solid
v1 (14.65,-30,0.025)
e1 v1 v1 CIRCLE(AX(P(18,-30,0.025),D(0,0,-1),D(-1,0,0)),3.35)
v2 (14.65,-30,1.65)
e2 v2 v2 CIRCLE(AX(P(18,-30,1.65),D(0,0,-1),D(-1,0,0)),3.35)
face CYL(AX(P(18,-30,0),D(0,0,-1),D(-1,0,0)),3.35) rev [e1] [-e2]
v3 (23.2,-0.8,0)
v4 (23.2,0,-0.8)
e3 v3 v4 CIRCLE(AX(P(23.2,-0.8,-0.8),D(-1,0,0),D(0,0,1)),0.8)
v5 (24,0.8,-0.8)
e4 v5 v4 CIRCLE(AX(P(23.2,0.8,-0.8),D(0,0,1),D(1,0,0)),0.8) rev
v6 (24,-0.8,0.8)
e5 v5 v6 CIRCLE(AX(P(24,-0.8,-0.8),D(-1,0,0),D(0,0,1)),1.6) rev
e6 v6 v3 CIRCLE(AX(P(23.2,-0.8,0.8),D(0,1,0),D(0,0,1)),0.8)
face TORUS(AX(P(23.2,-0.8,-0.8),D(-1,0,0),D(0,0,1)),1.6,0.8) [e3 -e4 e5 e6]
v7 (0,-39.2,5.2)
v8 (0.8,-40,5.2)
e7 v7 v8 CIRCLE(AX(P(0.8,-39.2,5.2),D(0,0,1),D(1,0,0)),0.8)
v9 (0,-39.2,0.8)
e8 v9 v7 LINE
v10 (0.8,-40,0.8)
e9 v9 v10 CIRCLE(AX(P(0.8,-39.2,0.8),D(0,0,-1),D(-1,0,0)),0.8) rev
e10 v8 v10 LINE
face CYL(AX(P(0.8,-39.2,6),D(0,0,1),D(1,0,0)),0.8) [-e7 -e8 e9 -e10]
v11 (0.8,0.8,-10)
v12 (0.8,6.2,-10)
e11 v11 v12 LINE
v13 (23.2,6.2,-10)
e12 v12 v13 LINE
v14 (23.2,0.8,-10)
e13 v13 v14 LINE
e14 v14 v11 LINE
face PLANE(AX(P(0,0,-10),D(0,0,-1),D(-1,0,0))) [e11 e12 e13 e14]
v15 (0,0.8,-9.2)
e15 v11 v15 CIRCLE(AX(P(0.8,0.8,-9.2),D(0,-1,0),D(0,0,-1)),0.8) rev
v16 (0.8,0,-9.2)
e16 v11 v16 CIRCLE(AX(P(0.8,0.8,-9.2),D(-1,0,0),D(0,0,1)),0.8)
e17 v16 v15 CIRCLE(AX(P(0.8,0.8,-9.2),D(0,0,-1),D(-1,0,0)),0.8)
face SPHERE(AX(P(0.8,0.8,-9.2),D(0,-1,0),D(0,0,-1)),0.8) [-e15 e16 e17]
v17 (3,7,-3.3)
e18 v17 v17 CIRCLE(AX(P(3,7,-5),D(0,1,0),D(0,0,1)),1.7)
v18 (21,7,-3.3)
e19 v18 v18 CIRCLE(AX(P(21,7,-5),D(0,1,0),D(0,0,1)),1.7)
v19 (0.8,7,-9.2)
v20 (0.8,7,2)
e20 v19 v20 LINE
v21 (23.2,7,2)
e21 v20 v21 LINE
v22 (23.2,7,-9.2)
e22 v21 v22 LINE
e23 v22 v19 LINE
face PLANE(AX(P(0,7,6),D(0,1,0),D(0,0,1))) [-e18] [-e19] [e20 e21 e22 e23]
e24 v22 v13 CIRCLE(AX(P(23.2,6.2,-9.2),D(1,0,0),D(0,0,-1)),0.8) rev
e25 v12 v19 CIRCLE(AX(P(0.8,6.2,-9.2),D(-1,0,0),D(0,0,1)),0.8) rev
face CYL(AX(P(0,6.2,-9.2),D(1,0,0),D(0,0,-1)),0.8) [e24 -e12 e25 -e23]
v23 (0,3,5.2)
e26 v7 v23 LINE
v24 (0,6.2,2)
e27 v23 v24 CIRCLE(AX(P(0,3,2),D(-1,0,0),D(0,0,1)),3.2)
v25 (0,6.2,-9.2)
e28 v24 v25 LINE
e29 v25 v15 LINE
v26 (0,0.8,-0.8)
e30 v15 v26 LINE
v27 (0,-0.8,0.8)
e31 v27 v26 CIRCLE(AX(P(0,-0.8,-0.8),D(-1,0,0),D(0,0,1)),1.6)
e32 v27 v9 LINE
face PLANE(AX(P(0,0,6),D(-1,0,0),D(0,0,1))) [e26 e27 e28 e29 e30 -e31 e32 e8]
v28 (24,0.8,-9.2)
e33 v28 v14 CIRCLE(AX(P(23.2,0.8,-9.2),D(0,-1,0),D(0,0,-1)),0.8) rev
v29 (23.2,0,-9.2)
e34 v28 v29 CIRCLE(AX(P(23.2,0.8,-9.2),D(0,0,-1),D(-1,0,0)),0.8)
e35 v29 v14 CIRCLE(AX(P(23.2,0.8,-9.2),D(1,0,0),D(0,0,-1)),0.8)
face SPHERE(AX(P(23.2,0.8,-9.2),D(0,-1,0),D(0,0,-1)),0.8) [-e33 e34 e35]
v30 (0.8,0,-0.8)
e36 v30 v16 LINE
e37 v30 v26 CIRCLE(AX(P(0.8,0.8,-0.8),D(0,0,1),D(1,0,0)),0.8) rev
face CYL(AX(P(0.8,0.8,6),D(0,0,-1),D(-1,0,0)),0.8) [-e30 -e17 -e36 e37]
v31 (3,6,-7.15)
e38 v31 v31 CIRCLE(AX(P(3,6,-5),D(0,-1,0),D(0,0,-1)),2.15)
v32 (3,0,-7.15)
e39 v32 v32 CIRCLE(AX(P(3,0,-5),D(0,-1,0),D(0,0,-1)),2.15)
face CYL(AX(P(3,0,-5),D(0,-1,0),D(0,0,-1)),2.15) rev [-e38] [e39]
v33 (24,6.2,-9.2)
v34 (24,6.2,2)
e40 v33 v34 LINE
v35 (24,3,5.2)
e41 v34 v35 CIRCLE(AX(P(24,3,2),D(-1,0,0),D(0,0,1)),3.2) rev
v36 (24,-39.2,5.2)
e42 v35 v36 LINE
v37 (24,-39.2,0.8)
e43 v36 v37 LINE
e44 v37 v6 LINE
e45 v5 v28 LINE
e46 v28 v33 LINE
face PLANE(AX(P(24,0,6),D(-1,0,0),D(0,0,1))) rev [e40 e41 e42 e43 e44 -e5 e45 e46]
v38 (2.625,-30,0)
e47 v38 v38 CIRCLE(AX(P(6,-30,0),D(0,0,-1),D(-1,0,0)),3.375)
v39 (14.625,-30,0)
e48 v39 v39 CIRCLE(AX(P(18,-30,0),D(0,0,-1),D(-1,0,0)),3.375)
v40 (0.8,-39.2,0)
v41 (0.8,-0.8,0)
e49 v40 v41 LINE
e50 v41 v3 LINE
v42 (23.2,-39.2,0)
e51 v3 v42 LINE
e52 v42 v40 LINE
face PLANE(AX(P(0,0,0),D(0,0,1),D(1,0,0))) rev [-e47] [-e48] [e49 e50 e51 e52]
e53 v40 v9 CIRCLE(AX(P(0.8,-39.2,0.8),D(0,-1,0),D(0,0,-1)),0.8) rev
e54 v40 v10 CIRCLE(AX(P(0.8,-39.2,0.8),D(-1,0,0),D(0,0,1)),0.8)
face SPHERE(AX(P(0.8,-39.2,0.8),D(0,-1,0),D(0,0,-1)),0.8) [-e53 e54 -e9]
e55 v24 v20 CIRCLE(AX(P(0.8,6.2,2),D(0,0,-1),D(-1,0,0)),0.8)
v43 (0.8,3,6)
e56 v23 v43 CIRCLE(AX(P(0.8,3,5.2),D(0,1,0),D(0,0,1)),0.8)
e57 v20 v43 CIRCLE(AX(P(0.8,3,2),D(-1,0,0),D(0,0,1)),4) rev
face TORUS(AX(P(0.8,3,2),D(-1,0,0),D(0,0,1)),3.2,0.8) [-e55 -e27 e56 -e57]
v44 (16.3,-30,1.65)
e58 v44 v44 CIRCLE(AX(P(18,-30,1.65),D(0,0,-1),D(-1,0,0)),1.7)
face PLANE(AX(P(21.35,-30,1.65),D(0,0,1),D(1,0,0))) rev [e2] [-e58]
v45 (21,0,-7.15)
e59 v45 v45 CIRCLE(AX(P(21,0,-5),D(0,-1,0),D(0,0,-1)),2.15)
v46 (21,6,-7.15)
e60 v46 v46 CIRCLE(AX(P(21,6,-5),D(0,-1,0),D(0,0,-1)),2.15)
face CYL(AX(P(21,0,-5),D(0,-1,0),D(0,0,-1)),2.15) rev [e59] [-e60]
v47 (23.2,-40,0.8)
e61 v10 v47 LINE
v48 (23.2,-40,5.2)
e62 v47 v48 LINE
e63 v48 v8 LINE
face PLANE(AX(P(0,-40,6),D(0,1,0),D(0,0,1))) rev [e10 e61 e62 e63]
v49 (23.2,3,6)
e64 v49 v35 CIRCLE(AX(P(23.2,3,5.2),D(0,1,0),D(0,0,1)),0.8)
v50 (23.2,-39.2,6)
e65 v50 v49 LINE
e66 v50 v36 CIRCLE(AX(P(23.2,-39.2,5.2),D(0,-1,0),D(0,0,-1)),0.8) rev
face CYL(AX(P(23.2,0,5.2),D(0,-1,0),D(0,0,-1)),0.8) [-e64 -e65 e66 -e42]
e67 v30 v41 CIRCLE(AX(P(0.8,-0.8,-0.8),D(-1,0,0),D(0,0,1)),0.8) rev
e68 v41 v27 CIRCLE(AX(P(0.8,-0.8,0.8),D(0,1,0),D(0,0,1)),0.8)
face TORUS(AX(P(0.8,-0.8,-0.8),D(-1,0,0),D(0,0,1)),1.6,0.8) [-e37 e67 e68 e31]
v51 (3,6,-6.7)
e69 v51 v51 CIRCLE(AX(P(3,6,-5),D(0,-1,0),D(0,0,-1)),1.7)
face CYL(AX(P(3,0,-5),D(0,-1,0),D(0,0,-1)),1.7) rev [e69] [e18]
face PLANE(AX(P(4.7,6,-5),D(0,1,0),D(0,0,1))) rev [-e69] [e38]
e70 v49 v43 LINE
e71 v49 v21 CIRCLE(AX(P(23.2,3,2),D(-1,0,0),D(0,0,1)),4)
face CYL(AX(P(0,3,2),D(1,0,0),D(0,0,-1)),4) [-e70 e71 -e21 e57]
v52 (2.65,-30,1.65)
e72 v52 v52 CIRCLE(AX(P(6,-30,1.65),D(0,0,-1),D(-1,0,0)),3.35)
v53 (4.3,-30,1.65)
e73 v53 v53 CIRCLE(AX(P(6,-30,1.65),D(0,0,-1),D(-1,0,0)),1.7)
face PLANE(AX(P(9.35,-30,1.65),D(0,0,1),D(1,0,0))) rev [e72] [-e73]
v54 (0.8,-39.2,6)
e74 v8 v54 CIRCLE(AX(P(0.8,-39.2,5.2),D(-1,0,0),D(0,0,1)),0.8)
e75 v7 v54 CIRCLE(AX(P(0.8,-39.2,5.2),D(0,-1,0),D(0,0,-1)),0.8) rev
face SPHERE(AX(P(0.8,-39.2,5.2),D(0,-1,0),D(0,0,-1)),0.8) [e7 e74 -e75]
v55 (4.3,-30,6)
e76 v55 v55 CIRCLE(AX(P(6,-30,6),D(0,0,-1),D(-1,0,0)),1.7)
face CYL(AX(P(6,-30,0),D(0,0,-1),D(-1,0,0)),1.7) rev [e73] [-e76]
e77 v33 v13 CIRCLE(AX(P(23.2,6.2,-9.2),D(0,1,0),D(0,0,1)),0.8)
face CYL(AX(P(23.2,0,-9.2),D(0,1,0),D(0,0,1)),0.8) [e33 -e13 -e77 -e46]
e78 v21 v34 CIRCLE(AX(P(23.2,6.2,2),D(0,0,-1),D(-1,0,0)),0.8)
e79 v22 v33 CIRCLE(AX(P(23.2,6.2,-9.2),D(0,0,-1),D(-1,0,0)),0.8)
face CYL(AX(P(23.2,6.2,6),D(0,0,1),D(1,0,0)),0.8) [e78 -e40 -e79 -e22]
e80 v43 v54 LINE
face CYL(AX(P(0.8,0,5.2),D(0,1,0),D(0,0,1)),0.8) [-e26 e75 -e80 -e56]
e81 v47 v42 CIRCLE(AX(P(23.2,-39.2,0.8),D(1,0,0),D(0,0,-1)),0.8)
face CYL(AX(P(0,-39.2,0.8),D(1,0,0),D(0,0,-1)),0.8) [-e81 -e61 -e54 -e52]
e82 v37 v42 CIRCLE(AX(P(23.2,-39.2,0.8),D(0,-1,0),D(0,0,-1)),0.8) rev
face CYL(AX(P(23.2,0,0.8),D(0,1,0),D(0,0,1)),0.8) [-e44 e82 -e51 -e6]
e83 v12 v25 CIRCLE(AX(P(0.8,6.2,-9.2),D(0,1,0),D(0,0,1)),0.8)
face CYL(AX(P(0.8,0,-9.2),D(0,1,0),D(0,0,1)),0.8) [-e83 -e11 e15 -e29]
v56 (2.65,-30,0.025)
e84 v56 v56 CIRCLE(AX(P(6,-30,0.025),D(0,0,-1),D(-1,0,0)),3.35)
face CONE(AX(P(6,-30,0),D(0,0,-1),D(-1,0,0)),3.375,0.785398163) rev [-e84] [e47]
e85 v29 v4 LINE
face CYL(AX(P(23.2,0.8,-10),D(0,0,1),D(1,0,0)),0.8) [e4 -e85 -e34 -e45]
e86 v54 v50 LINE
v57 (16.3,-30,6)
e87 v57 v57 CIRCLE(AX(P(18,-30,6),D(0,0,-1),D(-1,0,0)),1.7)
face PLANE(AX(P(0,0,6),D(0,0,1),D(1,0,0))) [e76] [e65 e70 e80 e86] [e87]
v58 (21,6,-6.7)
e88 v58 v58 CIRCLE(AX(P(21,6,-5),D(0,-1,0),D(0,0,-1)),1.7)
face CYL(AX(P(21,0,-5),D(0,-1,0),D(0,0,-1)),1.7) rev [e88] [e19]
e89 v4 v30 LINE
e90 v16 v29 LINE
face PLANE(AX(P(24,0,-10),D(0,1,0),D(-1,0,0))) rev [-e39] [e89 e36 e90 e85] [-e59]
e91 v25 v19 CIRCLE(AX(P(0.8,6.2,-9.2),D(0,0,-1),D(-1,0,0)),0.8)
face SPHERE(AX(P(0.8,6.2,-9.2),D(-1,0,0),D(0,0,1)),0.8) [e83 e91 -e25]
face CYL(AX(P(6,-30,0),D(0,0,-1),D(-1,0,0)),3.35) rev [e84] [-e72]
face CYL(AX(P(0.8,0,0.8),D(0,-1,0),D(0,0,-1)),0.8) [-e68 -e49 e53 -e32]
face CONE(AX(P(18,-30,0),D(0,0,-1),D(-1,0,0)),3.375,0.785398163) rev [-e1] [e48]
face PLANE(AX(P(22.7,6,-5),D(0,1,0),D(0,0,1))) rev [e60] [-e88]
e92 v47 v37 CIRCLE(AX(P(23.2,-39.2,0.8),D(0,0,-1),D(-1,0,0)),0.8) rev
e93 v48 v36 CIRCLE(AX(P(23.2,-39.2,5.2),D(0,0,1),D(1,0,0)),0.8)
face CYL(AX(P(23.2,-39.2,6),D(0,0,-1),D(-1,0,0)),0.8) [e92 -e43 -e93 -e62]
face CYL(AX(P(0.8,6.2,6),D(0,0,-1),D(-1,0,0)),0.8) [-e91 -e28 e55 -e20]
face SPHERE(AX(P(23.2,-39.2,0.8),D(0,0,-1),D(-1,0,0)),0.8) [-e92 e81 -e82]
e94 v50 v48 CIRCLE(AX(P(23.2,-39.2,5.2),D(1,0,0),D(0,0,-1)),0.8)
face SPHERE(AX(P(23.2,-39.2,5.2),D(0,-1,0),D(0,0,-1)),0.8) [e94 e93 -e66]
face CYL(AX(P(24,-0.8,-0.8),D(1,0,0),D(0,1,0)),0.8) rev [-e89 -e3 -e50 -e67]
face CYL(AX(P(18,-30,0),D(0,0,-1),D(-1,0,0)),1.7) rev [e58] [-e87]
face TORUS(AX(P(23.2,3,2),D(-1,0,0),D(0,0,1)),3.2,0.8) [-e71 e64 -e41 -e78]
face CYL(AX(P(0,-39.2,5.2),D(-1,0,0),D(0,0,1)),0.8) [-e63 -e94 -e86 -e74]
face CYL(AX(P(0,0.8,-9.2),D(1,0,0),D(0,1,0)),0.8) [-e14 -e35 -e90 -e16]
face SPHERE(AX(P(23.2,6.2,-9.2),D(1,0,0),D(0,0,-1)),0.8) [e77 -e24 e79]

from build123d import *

# Parameters (mm, degrees)
SKETCH2_W           = 24
SKETCH2_H           = 47
BOSS_EXTRUDE1_DEPTH = 6
SKETCH3_W           = 24
SKETCH3_H           = 7
BOSS_EXTRUDE2_DEPTH = 10
HOLE1_OUTLINE_R     = 2.15
HOLE1_DEPTH         = 6
HOLE1_START         = 6
HOLE1_2_OUTLINE_R   = 1.7
HOLE1_2_DEPTH       = 1
FILLET1_R           = 4
FILLET2_R           = 0.8


# Read off the part's stored shape, not the designer's step: Hole1, CBORE for M3 SBHCS1
with BuildPart() as part:
    # Sketch2 → Boss-Extrude1 (new body)
    with BuildSketch(Plane.XY):
        with Locations((12, -16.5)):
            Rectangle(SKETCH2_W, SKETCH2_H)
    extrude(amount=BOSS_EXTRUDE1_DEPTH)

    # Sketch3 → Boss-Extrude2 (add)
    with BuildSketch(Plane(origin=(0, 0, 0), x_dir=(-1, 0, 0), z_dir=(0, 0, -1))):
        with Locations((-12, 3.5)):
            Rectangle(SKETCH3_W, SKETCH3_H)
    extrude(amount=BOSS_EXTRUDE2_DEPTH)

    # Hole1 outline → Hole1 (cut)
    with BuildSketch(Plane(origin=(0, 0, 0), x_dir=(1, 0, 0), z_dir=(0, 1, 0))):
        with Locations((3, 5)):
            Circle(HOLE1_OUTLINE_R)
        with Locations((21, 5)):
            Circle(HOLE1_OUTLINE_R)
    extrude(amount=HOLE1_DEPTH, mode=Mode.SUBTRACT)

    # Hole1 2 outline → Hole1 2 (cut)
    with BuildSketch(Plane(origin=(0, 0, 0), x_dir=(1, 0, 0), z_dir=(0, 1, 0)).offset(HOLE1_START)):
        with Locations((3, 5)):
            Circle(HOLE1_2_OUTLINE_R)
        with Locations((21, 5)):
            Circle(HOLE1_2_OUTLINE_R)
    extrude(amount=HOLE1_2_DEPTH, mode=Mode.SUBTRACT)

    # CBORE for M3 SBHCS1 outline → CBORE for M3 SBHCS1 (revolve, cut)
    with BuildSketch(Plane(origin=(18, -30, 0), x_dir=(1, 0, 0), z_dir=(0, -1, 0))):
        Polygon((1.7, 1.65), (1.7, 6), (0, 6), (0, 0), (3.375, 0), (3.35, 0.025), (3.35, 1.65), align=None)
    revolve(axis=Axis((18, -30, 0), (0, 0, 1)), mode=Mode.SUBTRACT)

    # CBORE for M3 SBHCS1 2 outline → CBORE for M3 SBHCS1 2 (revolve, cut)
    with BuildSketch(Plane(origin=(6, -30, 0), x_dir=(1, 0, 0), z_dir=(0, -1, 0))):
        Polygon((0, 0), (3.375, 0), (3.35, 0.025), (3.35, 1.65), (1.7, 1.65), (1.7, 6), (0, 6), align=None)
    revolve(axis=Axis((6, -30, 0), (0, 0, 1)), mode=Mode.SUBTRACT)

    # Fillet1
    fillet1_edges = [part.edges().sort_by_distance(p)[0] for p in [
        (12, 7, 6),
    ]]
    fillet(fillet1_edges, radius=FILLET1_R)

    # Fillet2
    fillet2_edges = [part.edges().sort_by_distance(p)[0] for p in [
        (24, -40, 3),
        (0, -40, 3),
        (12, -40, 6),
        (24, -18.5, 6),
        (12, 0, 0),
        (24, 0, -5),
        (0, 0, -5),
        (24, 3.5, -10),
        (12, 0, -10),
        (0, 3.5, -10),
        (12, 7, -10),
        (0, -18.5, 6),
        (24, 7, -4),
        (0, 7, -4),
        (24, 5.828427125, 4.828427125),
        (24, -20, 0),
        (0, 5.828427125, 4.828427125),
        (12, -40, 0),
        (0, -20, 0),
    ]]
    fillet(fillet2_edges, radius=FILLET2_R)


solid = part.part
